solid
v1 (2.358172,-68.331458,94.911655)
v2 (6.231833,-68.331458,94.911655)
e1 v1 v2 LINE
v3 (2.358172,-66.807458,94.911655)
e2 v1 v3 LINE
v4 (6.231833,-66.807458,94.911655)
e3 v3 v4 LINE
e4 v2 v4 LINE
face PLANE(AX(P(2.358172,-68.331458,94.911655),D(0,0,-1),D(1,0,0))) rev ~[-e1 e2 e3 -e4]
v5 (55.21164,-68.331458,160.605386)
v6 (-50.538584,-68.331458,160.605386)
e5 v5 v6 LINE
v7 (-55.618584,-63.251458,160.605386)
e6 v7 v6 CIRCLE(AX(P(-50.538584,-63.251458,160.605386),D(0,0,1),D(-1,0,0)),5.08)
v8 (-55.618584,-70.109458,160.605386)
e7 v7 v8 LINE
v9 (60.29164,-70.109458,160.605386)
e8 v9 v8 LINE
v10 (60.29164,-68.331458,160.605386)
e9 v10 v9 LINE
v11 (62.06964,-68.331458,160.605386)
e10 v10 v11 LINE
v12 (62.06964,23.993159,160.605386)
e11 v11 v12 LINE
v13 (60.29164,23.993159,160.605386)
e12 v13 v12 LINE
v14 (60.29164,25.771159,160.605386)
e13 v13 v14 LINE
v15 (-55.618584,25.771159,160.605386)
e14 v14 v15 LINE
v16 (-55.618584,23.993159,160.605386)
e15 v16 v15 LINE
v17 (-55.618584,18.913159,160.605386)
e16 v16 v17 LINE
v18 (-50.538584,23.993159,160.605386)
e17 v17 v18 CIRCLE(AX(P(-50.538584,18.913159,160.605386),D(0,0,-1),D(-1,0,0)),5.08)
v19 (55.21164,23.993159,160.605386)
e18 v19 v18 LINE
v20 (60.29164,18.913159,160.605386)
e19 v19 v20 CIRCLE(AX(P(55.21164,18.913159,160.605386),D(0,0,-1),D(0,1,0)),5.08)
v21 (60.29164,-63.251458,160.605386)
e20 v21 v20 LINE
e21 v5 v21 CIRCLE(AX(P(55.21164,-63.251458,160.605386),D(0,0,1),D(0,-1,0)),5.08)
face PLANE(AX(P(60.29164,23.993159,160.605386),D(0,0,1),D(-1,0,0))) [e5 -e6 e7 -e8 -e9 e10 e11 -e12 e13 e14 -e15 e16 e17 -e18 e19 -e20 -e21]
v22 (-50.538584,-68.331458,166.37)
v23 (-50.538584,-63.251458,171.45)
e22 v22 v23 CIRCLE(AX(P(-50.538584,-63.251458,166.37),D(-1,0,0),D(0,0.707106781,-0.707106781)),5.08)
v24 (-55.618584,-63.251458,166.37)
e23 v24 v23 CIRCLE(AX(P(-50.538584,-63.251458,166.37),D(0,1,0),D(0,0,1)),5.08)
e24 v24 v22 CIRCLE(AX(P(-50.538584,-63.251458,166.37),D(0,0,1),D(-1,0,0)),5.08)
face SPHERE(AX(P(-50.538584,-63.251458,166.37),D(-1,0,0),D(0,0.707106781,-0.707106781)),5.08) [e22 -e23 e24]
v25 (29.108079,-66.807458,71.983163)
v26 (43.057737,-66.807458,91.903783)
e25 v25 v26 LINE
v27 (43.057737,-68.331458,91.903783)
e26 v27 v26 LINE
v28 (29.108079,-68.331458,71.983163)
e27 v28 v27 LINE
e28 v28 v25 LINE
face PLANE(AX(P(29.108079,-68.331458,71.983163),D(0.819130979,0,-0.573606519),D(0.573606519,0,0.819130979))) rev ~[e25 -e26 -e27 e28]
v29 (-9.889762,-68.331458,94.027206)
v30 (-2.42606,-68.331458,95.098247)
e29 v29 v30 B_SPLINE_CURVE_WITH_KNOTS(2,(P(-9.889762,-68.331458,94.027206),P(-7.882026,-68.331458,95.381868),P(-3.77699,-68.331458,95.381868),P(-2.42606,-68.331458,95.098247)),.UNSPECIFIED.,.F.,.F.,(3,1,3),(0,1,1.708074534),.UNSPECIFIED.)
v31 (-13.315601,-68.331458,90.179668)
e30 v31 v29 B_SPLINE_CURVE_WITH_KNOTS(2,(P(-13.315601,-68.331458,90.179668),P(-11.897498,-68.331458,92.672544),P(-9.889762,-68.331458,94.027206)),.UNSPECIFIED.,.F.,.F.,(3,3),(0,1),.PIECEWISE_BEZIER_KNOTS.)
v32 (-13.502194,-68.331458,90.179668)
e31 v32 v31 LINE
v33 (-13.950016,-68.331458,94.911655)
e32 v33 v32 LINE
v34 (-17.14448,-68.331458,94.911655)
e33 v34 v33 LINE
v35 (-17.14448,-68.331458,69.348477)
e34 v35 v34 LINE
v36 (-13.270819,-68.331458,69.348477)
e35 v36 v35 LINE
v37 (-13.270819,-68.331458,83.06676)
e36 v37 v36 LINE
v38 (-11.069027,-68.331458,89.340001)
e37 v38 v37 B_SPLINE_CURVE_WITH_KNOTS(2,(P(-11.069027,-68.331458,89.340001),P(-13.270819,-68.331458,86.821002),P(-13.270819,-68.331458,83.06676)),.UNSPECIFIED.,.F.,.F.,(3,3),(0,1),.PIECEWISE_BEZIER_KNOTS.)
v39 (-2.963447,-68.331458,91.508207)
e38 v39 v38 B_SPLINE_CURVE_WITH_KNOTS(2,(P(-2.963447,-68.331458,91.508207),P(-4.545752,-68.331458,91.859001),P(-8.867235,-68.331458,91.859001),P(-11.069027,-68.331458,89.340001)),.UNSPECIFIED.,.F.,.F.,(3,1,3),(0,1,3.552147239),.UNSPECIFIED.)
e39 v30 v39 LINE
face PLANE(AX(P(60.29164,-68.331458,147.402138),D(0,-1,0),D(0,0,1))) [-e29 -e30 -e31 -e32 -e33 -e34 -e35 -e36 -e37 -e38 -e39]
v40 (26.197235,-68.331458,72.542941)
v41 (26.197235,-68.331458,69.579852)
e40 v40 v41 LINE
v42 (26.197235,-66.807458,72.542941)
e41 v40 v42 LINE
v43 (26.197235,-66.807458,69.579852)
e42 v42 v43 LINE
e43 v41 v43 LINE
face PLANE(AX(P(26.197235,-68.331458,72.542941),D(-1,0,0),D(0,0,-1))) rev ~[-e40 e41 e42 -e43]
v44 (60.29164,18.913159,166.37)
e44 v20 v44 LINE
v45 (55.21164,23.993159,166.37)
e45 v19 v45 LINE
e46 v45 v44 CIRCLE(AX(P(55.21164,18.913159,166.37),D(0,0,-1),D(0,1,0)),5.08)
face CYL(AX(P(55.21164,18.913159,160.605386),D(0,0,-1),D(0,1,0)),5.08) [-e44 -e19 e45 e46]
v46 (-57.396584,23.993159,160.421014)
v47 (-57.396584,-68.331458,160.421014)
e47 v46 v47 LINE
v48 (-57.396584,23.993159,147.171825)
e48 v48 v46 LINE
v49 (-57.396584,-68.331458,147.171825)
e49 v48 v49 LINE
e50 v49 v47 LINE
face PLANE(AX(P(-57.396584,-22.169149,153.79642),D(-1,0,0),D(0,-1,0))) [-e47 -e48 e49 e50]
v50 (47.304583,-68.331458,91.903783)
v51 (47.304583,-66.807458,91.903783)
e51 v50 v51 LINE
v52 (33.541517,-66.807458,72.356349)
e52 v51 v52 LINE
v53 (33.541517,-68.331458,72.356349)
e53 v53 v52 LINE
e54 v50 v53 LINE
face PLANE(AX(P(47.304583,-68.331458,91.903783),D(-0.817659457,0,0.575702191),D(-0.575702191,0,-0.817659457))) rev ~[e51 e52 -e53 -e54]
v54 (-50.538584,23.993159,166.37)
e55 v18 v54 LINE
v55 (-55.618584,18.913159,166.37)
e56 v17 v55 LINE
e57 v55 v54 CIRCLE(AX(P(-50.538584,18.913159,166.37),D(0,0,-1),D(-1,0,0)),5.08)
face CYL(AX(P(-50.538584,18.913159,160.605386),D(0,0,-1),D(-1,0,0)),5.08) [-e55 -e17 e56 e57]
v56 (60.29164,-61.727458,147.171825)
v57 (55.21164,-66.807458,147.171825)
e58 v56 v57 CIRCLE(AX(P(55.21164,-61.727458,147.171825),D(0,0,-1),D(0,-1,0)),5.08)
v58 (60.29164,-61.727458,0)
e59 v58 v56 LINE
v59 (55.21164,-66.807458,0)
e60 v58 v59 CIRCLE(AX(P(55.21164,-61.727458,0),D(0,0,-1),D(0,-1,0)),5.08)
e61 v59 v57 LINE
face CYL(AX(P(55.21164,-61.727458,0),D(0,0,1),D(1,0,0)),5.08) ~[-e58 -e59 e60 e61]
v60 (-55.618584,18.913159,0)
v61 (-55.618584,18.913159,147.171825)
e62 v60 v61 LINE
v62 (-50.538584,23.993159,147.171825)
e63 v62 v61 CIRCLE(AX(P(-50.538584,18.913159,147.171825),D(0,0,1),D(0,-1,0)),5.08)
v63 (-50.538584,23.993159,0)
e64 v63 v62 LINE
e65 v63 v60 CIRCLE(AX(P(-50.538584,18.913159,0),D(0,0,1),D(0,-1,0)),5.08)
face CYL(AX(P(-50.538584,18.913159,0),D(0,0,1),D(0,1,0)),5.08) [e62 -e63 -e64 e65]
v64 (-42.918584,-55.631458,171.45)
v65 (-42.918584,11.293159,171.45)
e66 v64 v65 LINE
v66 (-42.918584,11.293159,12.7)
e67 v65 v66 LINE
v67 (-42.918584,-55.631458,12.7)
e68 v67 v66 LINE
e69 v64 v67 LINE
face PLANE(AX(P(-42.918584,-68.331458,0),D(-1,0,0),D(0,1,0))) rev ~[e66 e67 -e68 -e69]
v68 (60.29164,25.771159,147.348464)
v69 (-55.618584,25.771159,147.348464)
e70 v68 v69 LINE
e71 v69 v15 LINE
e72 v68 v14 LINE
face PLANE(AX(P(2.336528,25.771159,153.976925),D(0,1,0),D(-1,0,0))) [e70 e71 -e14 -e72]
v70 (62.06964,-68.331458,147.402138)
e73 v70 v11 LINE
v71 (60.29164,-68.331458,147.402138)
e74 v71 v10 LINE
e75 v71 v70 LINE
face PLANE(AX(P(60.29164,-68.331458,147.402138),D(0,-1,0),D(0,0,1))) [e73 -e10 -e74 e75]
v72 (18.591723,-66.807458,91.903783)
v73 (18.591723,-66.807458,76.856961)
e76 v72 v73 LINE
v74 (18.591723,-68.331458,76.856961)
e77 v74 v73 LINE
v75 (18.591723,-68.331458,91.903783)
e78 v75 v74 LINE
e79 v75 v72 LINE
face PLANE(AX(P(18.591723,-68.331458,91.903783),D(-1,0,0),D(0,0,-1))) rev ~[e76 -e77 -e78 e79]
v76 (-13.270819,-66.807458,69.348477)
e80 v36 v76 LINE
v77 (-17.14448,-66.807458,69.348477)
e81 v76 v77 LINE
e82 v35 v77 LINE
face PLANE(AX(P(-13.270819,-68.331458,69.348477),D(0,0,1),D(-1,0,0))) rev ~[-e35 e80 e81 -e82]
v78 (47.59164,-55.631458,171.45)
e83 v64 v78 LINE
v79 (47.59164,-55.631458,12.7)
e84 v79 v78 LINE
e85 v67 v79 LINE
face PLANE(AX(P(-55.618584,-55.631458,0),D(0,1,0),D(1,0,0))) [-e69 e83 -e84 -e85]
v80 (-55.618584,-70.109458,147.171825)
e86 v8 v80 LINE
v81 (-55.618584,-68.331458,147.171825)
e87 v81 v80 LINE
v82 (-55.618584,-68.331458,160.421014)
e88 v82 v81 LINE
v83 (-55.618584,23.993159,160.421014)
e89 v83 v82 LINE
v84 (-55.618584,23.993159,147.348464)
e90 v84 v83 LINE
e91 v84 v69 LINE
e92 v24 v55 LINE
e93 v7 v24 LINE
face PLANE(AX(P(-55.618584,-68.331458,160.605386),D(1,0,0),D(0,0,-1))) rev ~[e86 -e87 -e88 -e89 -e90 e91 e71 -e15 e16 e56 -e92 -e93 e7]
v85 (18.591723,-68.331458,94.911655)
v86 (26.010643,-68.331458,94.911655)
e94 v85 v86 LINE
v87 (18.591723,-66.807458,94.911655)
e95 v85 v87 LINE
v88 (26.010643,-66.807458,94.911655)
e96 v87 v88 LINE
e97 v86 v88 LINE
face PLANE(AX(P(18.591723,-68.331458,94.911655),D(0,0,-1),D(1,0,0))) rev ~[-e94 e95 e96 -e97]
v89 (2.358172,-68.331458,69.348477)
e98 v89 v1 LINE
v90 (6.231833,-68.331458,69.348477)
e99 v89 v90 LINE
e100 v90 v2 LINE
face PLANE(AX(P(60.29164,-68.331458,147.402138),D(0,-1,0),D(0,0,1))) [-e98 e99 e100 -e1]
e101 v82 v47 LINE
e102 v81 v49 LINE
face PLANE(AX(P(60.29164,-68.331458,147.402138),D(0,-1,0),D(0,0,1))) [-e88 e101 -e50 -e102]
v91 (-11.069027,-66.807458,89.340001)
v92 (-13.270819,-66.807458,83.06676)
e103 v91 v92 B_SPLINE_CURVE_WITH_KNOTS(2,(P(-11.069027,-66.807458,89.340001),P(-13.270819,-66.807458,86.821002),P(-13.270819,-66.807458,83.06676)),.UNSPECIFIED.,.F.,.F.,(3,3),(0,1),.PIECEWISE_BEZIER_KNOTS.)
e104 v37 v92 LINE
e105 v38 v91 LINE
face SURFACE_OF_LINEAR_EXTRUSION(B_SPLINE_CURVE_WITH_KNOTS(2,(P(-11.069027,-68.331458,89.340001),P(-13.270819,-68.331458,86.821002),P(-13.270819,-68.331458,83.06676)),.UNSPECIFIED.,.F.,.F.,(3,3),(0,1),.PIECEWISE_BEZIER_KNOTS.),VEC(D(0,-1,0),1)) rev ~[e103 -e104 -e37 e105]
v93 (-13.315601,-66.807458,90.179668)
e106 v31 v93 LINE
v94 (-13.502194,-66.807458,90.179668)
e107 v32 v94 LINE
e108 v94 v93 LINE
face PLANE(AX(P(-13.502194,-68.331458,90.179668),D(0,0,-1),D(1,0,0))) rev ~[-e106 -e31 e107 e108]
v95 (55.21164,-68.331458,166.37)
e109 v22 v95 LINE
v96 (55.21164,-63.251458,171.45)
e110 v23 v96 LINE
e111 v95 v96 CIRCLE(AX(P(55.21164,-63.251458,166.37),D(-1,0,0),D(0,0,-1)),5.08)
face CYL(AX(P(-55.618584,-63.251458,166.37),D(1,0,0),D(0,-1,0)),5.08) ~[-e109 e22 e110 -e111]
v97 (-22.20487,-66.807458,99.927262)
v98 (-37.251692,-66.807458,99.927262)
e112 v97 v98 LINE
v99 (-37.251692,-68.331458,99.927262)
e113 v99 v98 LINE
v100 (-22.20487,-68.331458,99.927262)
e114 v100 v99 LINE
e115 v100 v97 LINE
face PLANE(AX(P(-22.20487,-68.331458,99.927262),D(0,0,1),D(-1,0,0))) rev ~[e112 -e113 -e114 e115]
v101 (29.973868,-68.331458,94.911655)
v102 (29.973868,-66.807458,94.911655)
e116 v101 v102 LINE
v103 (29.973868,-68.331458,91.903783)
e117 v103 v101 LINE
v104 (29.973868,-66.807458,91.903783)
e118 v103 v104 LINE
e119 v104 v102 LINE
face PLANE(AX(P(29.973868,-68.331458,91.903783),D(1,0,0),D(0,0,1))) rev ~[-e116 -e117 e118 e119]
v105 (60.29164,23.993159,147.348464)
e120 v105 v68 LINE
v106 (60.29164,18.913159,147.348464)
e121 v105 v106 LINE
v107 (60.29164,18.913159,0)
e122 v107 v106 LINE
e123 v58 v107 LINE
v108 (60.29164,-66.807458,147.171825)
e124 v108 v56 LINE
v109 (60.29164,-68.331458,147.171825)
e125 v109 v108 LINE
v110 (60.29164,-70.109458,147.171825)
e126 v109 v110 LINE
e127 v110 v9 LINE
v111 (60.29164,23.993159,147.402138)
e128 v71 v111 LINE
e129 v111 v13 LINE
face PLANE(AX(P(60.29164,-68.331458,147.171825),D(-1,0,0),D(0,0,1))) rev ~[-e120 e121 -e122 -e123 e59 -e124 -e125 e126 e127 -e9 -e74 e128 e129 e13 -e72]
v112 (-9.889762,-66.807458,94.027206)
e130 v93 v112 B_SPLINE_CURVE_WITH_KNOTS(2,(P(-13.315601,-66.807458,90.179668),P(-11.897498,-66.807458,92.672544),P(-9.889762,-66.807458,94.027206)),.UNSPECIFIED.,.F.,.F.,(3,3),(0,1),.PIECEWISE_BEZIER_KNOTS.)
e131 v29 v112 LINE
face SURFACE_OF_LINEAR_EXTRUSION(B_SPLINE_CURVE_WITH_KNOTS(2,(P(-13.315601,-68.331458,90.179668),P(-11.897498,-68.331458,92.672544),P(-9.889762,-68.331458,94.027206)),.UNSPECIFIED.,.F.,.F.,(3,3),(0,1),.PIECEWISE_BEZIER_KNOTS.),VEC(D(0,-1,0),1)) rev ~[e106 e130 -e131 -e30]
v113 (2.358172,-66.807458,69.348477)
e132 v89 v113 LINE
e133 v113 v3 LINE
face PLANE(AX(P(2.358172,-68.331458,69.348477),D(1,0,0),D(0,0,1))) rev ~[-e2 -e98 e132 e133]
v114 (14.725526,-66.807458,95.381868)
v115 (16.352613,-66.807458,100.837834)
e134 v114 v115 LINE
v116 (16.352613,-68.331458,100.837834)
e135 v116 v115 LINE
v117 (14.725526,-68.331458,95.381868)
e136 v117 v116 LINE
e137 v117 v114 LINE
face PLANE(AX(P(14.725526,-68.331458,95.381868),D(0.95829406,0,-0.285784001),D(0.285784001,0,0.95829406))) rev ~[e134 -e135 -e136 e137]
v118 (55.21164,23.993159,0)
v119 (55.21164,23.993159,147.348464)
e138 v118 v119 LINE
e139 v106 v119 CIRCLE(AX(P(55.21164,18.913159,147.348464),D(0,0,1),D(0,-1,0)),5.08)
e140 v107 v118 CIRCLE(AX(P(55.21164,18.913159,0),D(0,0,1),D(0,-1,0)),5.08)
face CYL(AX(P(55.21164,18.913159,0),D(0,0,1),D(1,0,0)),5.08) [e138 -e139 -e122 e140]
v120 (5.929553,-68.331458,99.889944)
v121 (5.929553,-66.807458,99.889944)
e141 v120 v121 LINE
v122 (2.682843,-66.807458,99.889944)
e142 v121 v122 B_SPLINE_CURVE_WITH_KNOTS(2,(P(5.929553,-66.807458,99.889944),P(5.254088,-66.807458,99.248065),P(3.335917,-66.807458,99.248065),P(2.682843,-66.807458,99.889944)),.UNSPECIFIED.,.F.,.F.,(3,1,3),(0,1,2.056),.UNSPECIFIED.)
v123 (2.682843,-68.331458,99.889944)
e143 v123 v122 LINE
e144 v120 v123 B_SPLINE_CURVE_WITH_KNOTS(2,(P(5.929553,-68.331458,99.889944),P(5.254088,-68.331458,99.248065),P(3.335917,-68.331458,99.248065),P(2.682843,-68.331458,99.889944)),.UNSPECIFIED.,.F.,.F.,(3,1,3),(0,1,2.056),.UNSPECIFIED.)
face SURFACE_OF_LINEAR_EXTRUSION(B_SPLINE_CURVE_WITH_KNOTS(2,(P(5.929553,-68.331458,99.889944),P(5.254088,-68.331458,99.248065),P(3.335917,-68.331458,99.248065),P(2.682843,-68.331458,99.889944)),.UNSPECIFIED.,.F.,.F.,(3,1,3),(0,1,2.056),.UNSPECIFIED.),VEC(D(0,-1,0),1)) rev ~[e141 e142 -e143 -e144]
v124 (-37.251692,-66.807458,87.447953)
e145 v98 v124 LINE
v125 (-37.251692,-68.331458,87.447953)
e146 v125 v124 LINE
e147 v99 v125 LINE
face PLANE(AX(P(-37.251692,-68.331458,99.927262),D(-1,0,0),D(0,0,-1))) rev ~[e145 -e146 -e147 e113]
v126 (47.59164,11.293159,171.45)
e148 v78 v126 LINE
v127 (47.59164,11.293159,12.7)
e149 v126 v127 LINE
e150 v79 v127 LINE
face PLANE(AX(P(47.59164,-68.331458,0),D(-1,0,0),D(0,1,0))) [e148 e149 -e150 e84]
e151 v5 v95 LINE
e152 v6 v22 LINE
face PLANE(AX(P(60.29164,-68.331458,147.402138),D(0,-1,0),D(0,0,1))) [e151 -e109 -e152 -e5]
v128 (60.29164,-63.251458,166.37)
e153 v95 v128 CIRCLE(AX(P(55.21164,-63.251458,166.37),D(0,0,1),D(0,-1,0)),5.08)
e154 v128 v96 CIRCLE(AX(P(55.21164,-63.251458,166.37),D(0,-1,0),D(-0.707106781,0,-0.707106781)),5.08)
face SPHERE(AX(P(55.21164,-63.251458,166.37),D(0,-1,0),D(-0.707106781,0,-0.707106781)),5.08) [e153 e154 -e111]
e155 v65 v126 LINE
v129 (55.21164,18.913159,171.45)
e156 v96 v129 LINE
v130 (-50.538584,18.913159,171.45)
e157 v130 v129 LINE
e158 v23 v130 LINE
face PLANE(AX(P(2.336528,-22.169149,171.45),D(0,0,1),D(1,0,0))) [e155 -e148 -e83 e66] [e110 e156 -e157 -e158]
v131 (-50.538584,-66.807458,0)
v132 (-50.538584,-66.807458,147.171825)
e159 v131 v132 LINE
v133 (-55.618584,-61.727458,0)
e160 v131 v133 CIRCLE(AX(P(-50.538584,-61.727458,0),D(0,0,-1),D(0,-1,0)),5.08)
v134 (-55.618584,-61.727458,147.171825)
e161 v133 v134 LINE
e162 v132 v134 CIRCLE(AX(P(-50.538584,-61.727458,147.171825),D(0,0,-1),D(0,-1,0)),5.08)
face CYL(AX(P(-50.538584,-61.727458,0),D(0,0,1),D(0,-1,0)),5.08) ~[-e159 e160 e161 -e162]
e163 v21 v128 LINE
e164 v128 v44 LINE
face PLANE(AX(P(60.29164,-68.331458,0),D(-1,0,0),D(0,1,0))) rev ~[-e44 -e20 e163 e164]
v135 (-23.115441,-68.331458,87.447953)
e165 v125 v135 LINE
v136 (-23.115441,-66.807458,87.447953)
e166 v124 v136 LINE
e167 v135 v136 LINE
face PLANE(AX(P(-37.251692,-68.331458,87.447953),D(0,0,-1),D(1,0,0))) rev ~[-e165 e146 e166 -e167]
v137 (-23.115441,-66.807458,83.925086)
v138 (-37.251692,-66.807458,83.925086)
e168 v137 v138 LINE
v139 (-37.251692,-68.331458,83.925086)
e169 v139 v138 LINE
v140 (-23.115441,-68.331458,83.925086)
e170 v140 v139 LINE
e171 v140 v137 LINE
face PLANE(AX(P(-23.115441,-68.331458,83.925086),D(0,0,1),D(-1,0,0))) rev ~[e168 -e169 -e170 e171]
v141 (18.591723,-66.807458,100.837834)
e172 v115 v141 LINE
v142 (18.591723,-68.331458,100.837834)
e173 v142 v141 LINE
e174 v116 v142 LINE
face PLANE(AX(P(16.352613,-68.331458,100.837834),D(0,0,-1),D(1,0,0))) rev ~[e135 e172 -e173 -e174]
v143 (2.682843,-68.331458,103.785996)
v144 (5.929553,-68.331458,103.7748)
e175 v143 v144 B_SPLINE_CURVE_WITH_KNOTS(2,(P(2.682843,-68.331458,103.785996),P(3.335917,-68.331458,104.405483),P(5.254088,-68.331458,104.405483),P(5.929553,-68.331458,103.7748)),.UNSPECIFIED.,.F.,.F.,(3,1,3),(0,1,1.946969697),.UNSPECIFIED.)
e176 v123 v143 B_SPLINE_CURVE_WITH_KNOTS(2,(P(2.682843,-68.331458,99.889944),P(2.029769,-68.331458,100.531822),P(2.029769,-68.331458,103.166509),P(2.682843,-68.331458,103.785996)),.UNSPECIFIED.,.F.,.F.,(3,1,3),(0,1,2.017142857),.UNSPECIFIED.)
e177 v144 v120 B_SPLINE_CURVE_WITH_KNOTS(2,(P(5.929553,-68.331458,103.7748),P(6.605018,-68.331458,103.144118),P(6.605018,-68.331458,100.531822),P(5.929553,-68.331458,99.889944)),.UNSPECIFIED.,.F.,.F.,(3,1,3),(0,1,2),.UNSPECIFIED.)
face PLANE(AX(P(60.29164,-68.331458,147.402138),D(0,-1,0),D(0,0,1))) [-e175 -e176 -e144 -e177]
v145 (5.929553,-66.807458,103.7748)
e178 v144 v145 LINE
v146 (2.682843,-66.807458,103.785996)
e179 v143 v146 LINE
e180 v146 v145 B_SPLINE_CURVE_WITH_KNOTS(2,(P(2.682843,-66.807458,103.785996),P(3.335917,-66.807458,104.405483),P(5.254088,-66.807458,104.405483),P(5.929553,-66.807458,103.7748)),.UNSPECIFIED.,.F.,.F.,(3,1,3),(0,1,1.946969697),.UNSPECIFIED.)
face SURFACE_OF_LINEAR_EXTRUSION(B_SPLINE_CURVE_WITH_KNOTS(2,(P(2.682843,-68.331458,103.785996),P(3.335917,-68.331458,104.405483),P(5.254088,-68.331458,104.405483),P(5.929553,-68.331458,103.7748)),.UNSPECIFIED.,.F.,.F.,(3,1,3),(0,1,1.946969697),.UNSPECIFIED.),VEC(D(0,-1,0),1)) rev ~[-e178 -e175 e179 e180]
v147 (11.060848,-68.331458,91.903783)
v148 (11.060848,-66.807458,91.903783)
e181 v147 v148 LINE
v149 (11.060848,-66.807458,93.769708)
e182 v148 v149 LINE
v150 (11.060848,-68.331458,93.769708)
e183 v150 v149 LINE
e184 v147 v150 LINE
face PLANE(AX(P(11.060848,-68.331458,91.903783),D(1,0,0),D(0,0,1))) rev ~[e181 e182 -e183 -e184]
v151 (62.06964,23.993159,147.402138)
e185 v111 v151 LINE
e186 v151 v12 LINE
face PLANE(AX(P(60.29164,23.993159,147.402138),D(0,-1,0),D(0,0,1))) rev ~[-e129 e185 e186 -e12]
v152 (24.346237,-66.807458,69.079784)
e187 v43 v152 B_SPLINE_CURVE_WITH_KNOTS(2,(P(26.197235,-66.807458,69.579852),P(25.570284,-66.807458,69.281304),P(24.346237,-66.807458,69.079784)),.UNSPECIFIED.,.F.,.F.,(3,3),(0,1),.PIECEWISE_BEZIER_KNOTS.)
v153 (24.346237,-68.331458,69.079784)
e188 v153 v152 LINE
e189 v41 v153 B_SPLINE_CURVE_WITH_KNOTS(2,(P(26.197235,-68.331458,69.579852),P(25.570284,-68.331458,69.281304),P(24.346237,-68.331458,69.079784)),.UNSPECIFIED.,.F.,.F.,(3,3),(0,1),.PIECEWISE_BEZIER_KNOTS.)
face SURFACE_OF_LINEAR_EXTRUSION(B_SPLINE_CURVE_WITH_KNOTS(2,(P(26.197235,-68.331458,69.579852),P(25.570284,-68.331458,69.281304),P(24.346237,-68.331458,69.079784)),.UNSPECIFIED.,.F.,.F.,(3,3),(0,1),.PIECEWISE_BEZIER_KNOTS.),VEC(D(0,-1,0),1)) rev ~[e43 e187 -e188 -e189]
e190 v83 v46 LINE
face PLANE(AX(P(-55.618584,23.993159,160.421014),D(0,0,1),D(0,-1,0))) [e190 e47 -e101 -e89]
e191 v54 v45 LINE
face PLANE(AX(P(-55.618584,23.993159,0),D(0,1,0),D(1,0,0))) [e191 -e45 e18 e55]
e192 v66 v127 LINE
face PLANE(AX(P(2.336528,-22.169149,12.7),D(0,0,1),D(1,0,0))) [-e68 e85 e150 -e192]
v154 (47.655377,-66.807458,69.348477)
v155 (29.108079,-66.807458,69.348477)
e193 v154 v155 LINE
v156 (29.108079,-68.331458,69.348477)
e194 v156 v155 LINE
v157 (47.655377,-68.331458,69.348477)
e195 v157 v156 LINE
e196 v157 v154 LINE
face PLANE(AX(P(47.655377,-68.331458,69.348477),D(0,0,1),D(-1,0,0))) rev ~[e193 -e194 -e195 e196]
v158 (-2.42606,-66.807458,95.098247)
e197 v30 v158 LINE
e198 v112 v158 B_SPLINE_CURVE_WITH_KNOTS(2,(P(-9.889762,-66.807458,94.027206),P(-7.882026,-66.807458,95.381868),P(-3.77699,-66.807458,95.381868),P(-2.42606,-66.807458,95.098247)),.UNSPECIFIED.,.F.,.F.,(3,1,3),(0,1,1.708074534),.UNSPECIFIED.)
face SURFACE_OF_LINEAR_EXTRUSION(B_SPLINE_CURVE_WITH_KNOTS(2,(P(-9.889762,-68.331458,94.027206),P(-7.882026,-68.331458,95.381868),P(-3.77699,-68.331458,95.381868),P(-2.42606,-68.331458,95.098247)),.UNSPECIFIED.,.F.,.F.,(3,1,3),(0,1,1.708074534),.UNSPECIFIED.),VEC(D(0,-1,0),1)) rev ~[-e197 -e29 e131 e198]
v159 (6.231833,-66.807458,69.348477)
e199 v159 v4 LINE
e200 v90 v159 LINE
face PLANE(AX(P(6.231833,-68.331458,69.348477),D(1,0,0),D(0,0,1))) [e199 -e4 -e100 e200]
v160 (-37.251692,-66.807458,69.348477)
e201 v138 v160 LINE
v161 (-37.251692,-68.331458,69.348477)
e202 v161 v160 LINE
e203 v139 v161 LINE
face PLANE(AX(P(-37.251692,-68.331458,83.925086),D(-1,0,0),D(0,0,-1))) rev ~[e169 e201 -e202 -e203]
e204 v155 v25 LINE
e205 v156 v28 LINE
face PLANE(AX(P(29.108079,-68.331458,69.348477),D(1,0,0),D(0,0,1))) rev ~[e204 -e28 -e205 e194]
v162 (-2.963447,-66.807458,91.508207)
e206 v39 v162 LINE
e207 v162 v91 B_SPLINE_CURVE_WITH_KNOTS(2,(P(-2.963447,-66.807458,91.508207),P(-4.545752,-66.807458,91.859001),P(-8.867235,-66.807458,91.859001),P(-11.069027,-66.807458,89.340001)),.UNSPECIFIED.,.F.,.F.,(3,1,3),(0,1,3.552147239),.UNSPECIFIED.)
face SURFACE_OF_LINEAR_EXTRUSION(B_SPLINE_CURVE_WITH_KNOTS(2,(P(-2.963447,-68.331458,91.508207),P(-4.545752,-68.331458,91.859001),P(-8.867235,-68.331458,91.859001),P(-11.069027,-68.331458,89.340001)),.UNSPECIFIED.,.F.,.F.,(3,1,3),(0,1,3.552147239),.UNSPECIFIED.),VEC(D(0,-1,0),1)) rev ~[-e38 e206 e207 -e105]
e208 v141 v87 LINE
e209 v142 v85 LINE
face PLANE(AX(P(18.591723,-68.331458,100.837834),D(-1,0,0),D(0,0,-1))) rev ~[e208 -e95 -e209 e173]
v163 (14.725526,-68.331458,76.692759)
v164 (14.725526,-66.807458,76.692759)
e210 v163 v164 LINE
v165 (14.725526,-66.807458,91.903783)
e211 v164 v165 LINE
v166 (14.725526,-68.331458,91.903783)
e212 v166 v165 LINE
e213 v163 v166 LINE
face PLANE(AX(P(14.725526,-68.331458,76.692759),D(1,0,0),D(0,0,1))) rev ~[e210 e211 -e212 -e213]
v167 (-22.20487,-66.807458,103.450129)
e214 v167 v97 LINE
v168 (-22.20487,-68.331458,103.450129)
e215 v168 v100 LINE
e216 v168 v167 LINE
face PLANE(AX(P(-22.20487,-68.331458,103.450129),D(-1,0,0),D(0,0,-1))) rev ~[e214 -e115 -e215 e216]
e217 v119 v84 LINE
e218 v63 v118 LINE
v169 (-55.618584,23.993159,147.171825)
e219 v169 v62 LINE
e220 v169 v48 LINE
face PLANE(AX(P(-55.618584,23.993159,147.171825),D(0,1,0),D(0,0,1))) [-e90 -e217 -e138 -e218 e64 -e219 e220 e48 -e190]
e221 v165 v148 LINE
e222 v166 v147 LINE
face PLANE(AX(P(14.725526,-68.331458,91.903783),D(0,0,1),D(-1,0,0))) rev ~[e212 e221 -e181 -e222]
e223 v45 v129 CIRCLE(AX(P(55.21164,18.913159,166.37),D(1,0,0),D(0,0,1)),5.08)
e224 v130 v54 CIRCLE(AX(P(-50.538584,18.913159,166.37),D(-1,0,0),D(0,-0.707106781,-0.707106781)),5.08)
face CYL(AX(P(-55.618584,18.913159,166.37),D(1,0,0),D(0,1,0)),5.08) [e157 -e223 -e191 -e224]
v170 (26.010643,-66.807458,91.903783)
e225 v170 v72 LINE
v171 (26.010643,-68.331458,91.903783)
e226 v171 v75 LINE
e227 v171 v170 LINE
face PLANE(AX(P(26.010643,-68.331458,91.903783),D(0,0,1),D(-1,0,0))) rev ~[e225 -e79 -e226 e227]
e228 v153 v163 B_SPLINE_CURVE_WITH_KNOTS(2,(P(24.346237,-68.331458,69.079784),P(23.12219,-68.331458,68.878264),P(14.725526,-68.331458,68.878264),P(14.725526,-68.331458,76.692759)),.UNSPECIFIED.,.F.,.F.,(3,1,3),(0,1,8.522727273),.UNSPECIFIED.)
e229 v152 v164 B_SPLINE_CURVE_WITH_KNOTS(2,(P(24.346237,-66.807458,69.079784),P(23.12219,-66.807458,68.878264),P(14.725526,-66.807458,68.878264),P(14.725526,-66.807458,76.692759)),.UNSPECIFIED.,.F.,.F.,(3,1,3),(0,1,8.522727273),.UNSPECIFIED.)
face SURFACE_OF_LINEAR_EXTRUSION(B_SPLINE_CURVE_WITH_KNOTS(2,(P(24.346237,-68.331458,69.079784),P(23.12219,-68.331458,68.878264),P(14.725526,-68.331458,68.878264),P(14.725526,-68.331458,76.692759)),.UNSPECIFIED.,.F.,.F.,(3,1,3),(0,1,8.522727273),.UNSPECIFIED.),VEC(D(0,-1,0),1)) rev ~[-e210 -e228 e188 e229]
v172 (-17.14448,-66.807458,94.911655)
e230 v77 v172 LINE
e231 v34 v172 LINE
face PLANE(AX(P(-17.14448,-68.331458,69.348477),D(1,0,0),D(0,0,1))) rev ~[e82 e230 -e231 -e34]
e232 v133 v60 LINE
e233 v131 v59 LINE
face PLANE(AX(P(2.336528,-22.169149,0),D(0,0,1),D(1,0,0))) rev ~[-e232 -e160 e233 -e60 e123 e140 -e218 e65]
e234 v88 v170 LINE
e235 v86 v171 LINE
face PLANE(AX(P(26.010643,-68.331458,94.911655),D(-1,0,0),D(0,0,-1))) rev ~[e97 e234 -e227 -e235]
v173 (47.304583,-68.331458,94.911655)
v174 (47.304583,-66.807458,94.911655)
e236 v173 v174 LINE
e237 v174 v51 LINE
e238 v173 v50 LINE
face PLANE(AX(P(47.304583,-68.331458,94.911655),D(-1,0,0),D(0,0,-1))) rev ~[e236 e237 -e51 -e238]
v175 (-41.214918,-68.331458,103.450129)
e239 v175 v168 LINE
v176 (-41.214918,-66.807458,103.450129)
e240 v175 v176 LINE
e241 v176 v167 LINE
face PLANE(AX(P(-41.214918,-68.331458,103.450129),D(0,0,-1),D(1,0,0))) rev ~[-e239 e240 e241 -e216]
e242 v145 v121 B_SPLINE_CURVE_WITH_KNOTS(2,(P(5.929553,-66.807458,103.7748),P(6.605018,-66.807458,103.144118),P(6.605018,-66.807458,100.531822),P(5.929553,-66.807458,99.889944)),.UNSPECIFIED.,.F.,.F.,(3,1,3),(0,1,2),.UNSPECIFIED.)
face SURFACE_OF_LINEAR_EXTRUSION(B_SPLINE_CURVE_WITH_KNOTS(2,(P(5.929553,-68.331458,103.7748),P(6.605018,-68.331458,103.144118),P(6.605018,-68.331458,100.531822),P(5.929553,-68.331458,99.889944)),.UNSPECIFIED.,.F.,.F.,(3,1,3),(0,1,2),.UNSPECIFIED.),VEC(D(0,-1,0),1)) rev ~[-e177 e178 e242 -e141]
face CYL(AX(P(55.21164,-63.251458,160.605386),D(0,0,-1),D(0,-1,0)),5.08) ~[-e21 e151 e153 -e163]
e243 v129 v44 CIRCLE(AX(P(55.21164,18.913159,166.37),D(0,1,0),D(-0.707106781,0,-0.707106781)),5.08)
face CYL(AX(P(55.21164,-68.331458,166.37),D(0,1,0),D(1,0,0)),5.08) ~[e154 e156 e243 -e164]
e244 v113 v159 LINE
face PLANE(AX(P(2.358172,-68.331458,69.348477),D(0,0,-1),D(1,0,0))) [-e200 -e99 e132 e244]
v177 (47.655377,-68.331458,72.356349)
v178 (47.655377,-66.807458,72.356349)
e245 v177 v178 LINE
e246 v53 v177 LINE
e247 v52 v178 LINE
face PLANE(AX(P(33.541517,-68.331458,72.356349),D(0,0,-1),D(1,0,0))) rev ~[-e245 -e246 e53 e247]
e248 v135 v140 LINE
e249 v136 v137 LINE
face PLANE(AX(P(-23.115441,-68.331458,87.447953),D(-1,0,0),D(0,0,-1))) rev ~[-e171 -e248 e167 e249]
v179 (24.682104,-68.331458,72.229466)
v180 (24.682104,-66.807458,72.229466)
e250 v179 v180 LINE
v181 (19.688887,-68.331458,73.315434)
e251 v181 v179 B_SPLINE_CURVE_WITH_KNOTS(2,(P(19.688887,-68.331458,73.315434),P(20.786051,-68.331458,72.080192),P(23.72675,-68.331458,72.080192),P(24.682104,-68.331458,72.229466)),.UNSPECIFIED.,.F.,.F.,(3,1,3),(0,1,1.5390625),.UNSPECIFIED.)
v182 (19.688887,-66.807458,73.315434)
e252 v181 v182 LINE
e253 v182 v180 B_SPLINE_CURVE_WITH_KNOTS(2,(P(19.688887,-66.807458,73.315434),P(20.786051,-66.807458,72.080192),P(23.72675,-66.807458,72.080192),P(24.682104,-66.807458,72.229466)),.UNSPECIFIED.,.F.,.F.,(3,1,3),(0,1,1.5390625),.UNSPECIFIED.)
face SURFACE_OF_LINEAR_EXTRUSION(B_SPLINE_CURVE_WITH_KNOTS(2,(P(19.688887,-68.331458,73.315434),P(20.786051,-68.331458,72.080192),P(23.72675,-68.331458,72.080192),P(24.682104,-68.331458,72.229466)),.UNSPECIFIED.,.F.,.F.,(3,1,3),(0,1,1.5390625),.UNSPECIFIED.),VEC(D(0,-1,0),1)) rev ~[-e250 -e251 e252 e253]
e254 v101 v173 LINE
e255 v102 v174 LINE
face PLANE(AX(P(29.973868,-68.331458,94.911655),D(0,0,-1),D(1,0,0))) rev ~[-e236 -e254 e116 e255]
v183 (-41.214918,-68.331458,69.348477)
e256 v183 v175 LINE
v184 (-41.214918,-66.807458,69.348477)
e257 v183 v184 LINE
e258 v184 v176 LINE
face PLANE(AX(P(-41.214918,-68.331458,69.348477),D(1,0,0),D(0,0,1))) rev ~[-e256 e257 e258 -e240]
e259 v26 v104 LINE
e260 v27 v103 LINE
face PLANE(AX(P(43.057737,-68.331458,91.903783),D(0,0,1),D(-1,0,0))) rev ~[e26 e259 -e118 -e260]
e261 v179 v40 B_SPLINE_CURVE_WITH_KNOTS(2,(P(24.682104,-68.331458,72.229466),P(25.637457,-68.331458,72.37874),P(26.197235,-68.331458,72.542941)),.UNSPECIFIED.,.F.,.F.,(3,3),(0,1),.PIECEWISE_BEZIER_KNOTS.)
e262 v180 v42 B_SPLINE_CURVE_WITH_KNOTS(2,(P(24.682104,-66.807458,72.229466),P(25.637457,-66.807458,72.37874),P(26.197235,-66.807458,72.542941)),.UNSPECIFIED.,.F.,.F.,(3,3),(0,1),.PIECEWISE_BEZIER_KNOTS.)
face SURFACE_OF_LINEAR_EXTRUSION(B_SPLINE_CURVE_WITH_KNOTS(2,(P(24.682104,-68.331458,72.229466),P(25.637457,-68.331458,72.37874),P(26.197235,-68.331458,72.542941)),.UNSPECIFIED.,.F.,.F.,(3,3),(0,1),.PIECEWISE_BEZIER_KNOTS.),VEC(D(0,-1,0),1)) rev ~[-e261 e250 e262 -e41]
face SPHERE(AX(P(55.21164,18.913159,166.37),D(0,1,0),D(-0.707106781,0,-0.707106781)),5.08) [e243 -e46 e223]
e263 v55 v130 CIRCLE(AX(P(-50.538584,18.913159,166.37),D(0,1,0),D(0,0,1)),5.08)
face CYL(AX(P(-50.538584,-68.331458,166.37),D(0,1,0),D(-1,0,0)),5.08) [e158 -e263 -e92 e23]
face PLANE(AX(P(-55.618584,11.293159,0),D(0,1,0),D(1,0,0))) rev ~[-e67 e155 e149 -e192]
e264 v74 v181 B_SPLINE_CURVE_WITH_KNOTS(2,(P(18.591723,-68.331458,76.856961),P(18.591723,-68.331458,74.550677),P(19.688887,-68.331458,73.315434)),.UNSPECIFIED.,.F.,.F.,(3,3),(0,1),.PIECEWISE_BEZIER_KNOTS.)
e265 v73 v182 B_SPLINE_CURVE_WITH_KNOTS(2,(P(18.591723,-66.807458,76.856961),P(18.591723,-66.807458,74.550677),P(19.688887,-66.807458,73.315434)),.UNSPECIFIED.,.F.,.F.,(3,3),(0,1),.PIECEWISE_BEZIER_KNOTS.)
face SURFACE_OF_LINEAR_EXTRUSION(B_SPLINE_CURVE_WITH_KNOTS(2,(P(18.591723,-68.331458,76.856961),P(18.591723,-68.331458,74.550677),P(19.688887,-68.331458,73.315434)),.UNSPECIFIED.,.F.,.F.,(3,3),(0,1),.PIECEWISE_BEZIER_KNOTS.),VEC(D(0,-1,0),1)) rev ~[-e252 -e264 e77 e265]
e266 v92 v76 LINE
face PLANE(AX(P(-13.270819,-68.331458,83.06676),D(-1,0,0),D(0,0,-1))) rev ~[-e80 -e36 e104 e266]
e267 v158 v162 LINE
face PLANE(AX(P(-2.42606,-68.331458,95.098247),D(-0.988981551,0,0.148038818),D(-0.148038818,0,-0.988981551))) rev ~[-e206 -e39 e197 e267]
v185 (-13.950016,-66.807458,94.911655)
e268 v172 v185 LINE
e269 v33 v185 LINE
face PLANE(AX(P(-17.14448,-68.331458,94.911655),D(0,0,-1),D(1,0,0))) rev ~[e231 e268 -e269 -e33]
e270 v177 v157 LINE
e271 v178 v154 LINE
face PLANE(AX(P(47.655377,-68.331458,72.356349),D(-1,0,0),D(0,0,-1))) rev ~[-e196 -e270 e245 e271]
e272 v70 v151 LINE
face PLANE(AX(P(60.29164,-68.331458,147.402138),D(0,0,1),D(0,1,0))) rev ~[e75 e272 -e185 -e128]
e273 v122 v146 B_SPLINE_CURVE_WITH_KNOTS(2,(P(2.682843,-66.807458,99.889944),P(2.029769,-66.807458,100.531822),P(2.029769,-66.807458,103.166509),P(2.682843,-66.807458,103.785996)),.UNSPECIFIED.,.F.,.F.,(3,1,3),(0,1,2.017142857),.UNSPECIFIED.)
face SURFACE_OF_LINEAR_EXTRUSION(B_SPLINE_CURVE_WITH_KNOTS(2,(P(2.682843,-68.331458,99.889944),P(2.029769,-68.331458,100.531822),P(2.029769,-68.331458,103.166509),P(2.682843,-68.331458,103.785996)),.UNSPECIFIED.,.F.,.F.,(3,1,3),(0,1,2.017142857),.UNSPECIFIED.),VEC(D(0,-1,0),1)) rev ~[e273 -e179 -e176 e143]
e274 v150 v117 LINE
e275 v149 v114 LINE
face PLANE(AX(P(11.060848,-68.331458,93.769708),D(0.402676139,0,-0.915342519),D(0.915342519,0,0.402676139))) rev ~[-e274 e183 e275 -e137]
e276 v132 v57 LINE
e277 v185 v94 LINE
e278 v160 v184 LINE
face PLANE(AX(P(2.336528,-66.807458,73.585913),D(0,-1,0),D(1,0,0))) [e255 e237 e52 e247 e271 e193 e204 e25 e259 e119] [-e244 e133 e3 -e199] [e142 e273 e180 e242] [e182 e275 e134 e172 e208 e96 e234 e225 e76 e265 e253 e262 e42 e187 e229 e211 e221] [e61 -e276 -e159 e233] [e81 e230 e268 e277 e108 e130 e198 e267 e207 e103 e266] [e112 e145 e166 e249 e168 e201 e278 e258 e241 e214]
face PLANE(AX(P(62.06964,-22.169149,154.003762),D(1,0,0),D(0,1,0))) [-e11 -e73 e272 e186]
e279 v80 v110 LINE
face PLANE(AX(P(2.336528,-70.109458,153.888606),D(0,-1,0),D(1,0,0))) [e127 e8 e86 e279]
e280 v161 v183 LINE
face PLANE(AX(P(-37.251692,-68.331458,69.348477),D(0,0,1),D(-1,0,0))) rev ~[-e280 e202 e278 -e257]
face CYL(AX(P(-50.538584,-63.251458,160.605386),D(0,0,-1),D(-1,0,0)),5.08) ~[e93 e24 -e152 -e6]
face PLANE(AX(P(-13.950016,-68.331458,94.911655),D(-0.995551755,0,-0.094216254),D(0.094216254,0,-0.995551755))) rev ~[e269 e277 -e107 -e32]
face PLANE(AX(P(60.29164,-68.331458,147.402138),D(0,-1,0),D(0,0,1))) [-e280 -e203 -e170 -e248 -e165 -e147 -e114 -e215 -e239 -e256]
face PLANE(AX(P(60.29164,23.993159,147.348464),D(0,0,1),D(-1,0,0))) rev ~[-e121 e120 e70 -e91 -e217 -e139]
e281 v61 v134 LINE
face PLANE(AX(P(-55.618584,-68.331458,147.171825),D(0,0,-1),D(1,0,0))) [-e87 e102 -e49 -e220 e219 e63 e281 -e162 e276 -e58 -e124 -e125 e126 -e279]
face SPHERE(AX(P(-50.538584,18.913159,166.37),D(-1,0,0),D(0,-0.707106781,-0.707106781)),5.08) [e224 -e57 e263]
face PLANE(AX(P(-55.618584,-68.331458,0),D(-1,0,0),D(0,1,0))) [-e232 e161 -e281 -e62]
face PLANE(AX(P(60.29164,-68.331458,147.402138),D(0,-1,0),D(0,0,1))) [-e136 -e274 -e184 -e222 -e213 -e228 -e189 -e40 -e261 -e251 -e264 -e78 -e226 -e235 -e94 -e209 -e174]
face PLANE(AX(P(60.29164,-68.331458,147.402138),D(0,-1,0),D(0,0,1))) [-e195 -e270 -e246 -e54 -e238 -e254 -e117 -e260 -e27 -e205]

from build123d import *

# Parameters (mm, degrees)
F0_W          = 115.9102246165
F0_H          = 92.3246163875
F1_DEPTH      = 171.45
F2_T          = -12.7
F3_R          = 5.08
F4_W          = 115.9102246165
F4_H          = 13.2569223642
F6_DEPTH      = 1.778
F5_W          = 92.3246163875
F5_H          = 13.2491886616
F7_DEPTH      = 1.778
F8_W          = 92.3246163875
F8_H          = 13.2032483816
F9_DEPTH      = 1.778
F11_DEPTH     = 1.778
F12_W         = 115.9102246165
F12_H         = 147.1718251705
F12_W_2       = 3.8736611168
F12_H_2       = 25.5631778903
F13_DEPTH     = 1.524
F14_R         = 5.08
F15_T1_DEPTH  = 5.7646141005
F15_S5_W      = 5.08
F15_S5_H      = 5.08
F15_T6_DEPTH  = 5.08
F15_S11_W     = 5.08
F15_S11_H     = 5.08
F15_T12_DEPTH = 5.08
F15_S17_W     = 5.08
F15_S17_H     = 5.08
F15_T18_DEPTH = 5.08
F15_S23_W     = 5.08
F15_S23_H     = 5.08
F15_T24_DEPTH = 5.08


# Not quite as in the source:
# - a fillet or chamfer that OpenCascade refuses, or shapes differently, is made with other operations: its cross-section is extruded or revolved along the edge and cut away or added
# - a feature names something its author has since deleted; it is built from what else it names


with BuildPart() as f1:
    # F0 (on Top) → F1 (new body)
    with BuildSketch(Plane.XY):
        with Locations((2.3365281522, -22.1691494808)):
            Rectangle(F0_W, F0_H)
    extrude(amount=F1_DEPTH)

    # F2
    f2_openings = [f1.faces().sort_by_distance(p)[0] for p in [
        (2.336528, -22.169149, 171.45),
    ]]
    offset(amount=F2_T, openings=f2_openings)

    # F3
    f3_edges = [f1.edges().sort_by_distance(p)[0] for p in [
        (60.29164, -22.169149, 171.45),
        (2.336528, 23.993159, 171.45),
        (-55.618584, -22.169149, 171.45),
        (2.336528, -68.331458, 171.45),
    ]]
    fillet(f3_edges, radius=F3_R)

    # F4 (on face) → F6 (join)
    with BuildSketch(Plane(origin=(0, 23.993158713, 0), x_dir=(-1, 0, 0), z_dir=(0, 1, 0))):
        with Locations((-2.3365281522, 153.9769247174)):
            Rectangle(F4_W, F4_H)
    extrude(amount=F6_DEPTH)

    # F5 (on face) → F7 (join)
    with BuildSketch(Plane(origin=(-55.618584156, 0, 0), x_dir=(0, -1, 0), z_dir=(-1, 0, 0))):
        with Locations((22.1691494808, 153.7964195013)):
            Rectangle(F5_W, F5_H)
    extrude(amount=F7_DEPTH)

    # F8 (on face) → F9 (join)
    with BuildSketch(Plane.YZ.offset(60.2916404605)):
        with Locations((-22.1691494808, 154.0037617087)):
            Rectangle(F8_W, F8_H)
    extrude(amount=F9_DEPTH)

    # F10 (on face) → F11 (join)
    with BuildSketch(Plane.XZ.offset(68.3314576745)):
        Polygon((60.2916404605, 147.4021375179), (60.2916404605, 160.6053858995), (-55.618584156, 160.6053858995), (-55.618584156, 160.4210138321), (-55.618584156, 147.1718251705), (60.2916404605, 147.1718251705), align=None)
    extrude(amount=F11_DEPTH)

    # F12 (on face) → F13 (cut)
    with BuildSketch(Plane.XZ.offset(68.3314576745)):
        with Locations((2.3365281522, 73.5859125853)):
            Rectangle(F12_W, F12_H)
        Polygon((-37.2516920373, 83.9250860008), (-37.2516920373, 69.3484768271), (-41.214917573, 69.3484768271), (-41.214917573, 103.4501293179), (-22.2048696645, 103.4501293179), (-22.2048696645, 99.9272621751), (-37.2516920373, 99.9272621751), (-37.2516920373, 87.4479531437), (-23.1154412565, 87.4479531437), (-23.1154412565, 83.9250860008), align=None, mode=Mode.SUBTRACT)
        with BuildLine():
            add(Edge.make_bspline(
                [(-9.8897620677, 94.027206081), (-7.8820263443, 95.3818679166), (-5.4787144375, 95.3818679166)],
                knots=[0, 0, 0, 1, 1, 1], degree=2))
            add(Edge.make_bspline(
                [(-5.4787144375, 95.3818679166), (-3.7769904787, 95.3818679166), (-2.4260604938, 95.0982472568)],
                knots=[0, 0, 0, 1, 1, 1], degree=2))
            Line((-2.4260604938, 95.0982472568), (-2.9634470072, 91.5082067998))
            add(Edge.make_bspline(
                [(-2.9634470072, 91.5082067998), (-4.5457517408, 91.8590007738), (-5.7623350973, 91.8590007738)],
                knots=[0, 0, 0, 1, 1, 1], degree=2))
            add(Edge.make_bspline(
                [(-5.7623350973, 91.8590007738), (-8.867234952, 91.8590007738), (-11.0690269163, 89.3400014926)],
                knots=[0, 0, 0, 1, 1, 1], degree=2))
            add(Edge.make_bspline(
                [(-11.0690269163, 89.3400014926), (-13.2708188806, 86.8210022115), (-13.2708188806, 83.0667603198)],
                knots=[0, 0, 0, 1, 1, 1], degree=2))
            Line((-13.2708188806, 83.0667603198), (-13.2708188806, 69.3484768271))
            Line((-13.2708188806, 69.3484768271), (-17.1444799974, 69.3484768271))
            Line((-17.1444799974, 69.3484768271), (-17.1444799974, 94.9116547175))
            Line((-17.1444799974, 94.9116547175), (-13.9500157238, 94.9116547175))
            Line((-13.9500157238, 94.9116547175), (-13.5021936294, 90.1796679197))
            Line((-13.5021936294, 90.1796679197), (-13.31560109, 90.1796679197))
            add(Edge.make_bspline(
                [(-13.31560109, 90.1796679197), (-11.897497791, 92.6725442453), (-9.8897620677, 94.027206081)],
                knots=[0, 0, 0, 1, 1, 1], degree=2))
        make_face(mode=Mode.SUBTRACT)
        with Locations((4.2950027734, 82.1300657723)):
            Rectangle(F12_W_2, F12_H_2, mode=Mode.SUBTRACT)
        with BuildLine():
            add(Edge.make_bspline(
                [(19.6888872694, 73.3154342136), (20.7860514007, 72.0801916032), (22.6967590036, 72.0801916032)],
                knots=[0, 0, 0, 1, 1, 1], degree=2))
            add(Edge.make_bspline(
                [(22.6967590036, 72.0801916032), (23.7267498208, 72.0801916032), (24.6821036223, 72.2294656346)],
                knots=[0, 0, 0, 1, 1, 1], degree=2))
            add(Edge.make_bspline(
                [(24.6821036223, 72.2294656346), (25.6374574237, 72.3787396661), (26.1972350418, 72.5429411007)],
                knots=[0, 0, 0, 1, 1, 1], degree=2))
            Line((26.1972350418, 72.5429411007), (26.1972350418, 69.5798515759))
            add(Edge.make_bspline(
                [(26.1972350418, 69.5798515759), (25.5702841096, 69.281303513), (24.3462370515, 69.0797835705)],
                knots=[0, 0, 0, 1, 1, 1], degree=2))
            add(Edge.make_bspline(
                [(24.3462370515, 69.0797835705), (23.1221899933, 68.878263628), (22.1369813856, 68.878263628)],
                knots=[0, 0, 0, 1, 1, 1], degree=2))
            add(Edge.make_bspline(
                [(22.1369813856, 68.878263628), (14.7255257228, 68.878263628), (14.7255257228, 76.6927591758)],
                knots=[0, 0, 0, 1, 1, 1], degree=2))
            Line((14.7255257228, 76.6927591758), (14.7255257228, 91.9037829832))
            Line((14.7255257228, 91.9037829832), (11.0608482501, 91.9037829832))
            Line((11.0608482501, 91.9037829832), (11.0608482501, 93.7697083767))
            Line((11.0608482501, 93.7697083767), (14.7255257228, 95.3818679166))
            Line((14.7255257228, 95.3818679166), (16.3526126659, 100.8378337671))
            Line((16.3526126659, 100.8378337671), (18.591723138, 100.8378337671))
            Line((18.591723138, 100.8378337671), (18.591723138, 94.9116547175))
            Line((18.591723138, 94.9116547175), (26.0106425024, 94.9116547175))
            Line((26.0106425024, 94.9116547175), (26.0106425024, 91.9037829832))
            Line((26.0106425024, 91.9037829832), (18.591723138, 91.9037829832))
            Line((18.591723138, 91.9037829832), (18.591723138, 76.8569606104))
            add(Edge.make_bspline(
                [(18.591723138, 76.8569606104), (18.591723138, 74.5506768241), (19.6888872694, 73.3154342136)],
                knots=[0, 0, 0, 1, 1, 1], degree=2))
        make_face(mode=Mode.SUBTRACT)
        with BuildLine():
            add(Edge.make_bspline(
                [(2.6828432334, 99.8899436672), (2.0297693457, 100.5318220026), (2.0297693457, 101.837969778)],
                knots=[0, 0, 0, 1, 1, 1], degree=2))
            add(Edge.make_bspline(
                [(2.0297693457, 101.837969778), (2.0297693457, 103.1665086581), (2.6828432334, 103.7859958888)],
                knots=[0, 0, 0, 1, 1, 1], degree=2))
            add(Edge.make_bspline(
                [(2.6828432334, 103.7859958888), (3.3359171211, 104.4054831194), (4.3211257289, 104.4054831194)],
                knots=[0, 0, 0, 1, 1, 1], degree=2))
            add(Edge.make_bspline(
                [(4.3211257289, 104.4054831194), (5.2540884256, 104.4054831194), (5.9295534181, 103.7748003364)],
                knots=[0, 0, 0, 1, 1, 1], degree=2))
            add(Edge.make_bspline(
                [(5.9295534181, 103.7748003364), (6.6050184105, 103.1441175534), (6.6050184105, 101.837969778)],
                knots=[0, 0, 0, 1, 1, 1], degree=2))
            add(Edge.make_bspline(
                [(6.6050184105, 101.837969778), (6.6050184105, 100.5318220026), (5.9295534181, 99.8899436672)],
                knots=[0, 0, 0, 1, 1, 1], degree=2))
            add(Edge.make_bspline(
                [(5.9295534181, 99.8899436672), (5.2540884256, 99.2480653319), (4.3211257289, 99.2480653319)],
                knots=[0, 0, 0, 1, 1, 1], degree=2))
            add(Edge.make_bspline(
                [(4.3211257289, 99.2480653319), (3.3359171211, 99.2480653319), (2.6828432334, 99.8899436672)],
                knots=[0, 0, 0, 1, 1, 1], degree=2))
        make_face(mode=Mode.SUBTRACT)
        Polygon((47.6553770665, 72.3563485614), (47.6553770665, 69.3484768271), (29.1080786556, 69.3484768271), (29.1080786556, 71.9831634827), (43.057736897, 91.9037829832), (29.9738680381, 91.9037829832), (29.9738680381, 94.9116547175), (47.3045830925, 94.9116547175), (47.3045830925, 91.9037829832), (33.5415173904, 72.3563485614), align=None, mode=Mode.SUBTRACT)
    extrude(amount=-F13_DEPTH, mode=Mode.SUBTRACT)

    # F14
    f14_edges = [f1.edges().sort_by_distance(p)[0] for p in [
        (60.29164, -66.807458, 73.585913),
        (-55.618584, -66.807458, 73.585913),
        (-55.618584, 23.993159, 73.585913),
        (60.29164, 23.993159, 73.674232),
    ]]
    fillet(f14_edges, radius=F14_R)

    # F15: fillet of radius 5.08 on 4 edges, made by hand

    # F15_s2 → F15_t1 (cut)
    with BuildSketch(Plane.XY.offset(160.6053858995)):
        with BuildLine():
            ThreePointArc((-55.618584156, -63.2514576745), (-54.1306866045, -66.8435601229), (-50.538584156, -68.3314576745))
            Line((-50.538584156, -68.3314576745), (-55.618584156, -68.3314576745))
            Line((-55.618584156, -68.3314576745), (-55.618584156, -63.2514576745))
        make_face()
        with BuildLine():
            ThreePointArc((55.2116404605, -68.3314576745), (58.8037429089, -66.8435601229), (60.2916404605, -63.2514576745))
            Line((60.2916404605, -63.2514576745), (60.2916404605, -68.3314576745))
            Line((60.2916404605, -68.3314576745), (55.2116404605, -68.3314576745))
        make_face()
        with BuildLine():
            ThreePointArc((55.2116404605, 23.993158713), (58.8037429089, 22.5052611614), (60.2916404605, 18.913158713))
            Line((60.2916404605, 18.913158713), (60.2916404605, 23.993158713))
            Line((60.2916404605, 23.993158713), (55.2116404605, 23.993158713))
        make_face()
        with BuildLine():
            ThreePointArc((-55.618584156, 18.913158713), (-54.1306866045, 22.5052611614), (-50.538584156, 23.993158713))
            Line((-50.538584156, 23.993158713), (-55.618584156, 23.993158713))
            Line((-55.618584156, 23.993158713), (-55.618584156, 18.913158713))
        make_face()
    extrude(amount=F15_T1_DEPTH, mode=Mode.SUBTRACT)


with BuildPart() as f15_tool4:
    # F15_s5 → F15_t6 (new body)
    with BuildSketch(Plane.YZ.offset(-50.538584156)):
        with Locations((21.453158713, 168.91)):
            Rectangle(F15_S5_W, F15_S5_H)
    extrude(amount=-F15_T6_DEPTH)

    # F15_s7 → F15_t8 (revolve, cut)
    with BuildSketch(Plane(origin=(-50.538584156, 18.913158713, 166.37), x_dir=(0, -0.7071067812, -0.7071067812), z_dir=(0, 0.7071067812, -0.7071067812))):
        with BuildLine():
            ThreePointArc((0, -5.08), (5.08, 0), (0, 5.08))
            Line((0, 5.08), (0, -5.08))
        make_face()
    revolve(axis=Axis((-50.538584156, 18.913158713, 166.37), (-1, 0, 0)), mode=Mode.SUBTRACT)


with BuildPart() as f1_1:
    add(f1.part)

    # F15_t3: cut F15_tool4
    add(f15_tool4.part, mode=Mode.SUBTRACT)


with BuildPart() as f15_tool10:
    # F15_s11 → F15_t12 (new body)
    with BuildSketch(Plane.XZ.offset(-18.913158713)):
        with Locations((57.7516404605, 168.91)):
            Rectangle(F15_S11_W, F15_S11_H)
    extrude(amount=-F15_T12_DEPTH)

    # F15_s13 → F15_t14 (revolve, cut)
    with BuildSketch(Plane(origin=(55.2116404605, 18.913158713, 166.37), x_dir=(-0.7071067812, 0, -0.7071067812), z_dir=(0.7071067812, 0, -0.7071067812))):
        with BuildLine():
            ThreePointArc((0, -5.08), (5.08, 0), (0, 5.08))
            Line((0, 5.08), (0, -5.08))
        make_face()
    revolve(axis=Axis((55.2116404605, 18.913158713, 166.37), (0, 1, 0)), mode=Mode.SUBTRACT)


with BuildPart() as f1_2:
    add(f1_1.part)

    # F15_t9: cut F15_tool10
    add(f15_tool10.part, mode=Mode.SUBTRACT)


with BuildPart() as f15_tool16:
    # F15_s17 → F15_t18 (new body)
    with BuildSketch(Plane.XZ.offset(63.2514576745)):
        with Locations((57.7516404605, 168.91)):
            Rectangle(F15_S17_W, F15_S17_H)
    extrude(amount=F15_T18_DEPTH)

    # F15_s19 → F15_t20 (revolve, cut)
    with BuildSketch(Plane(origin=(55.2116404605, -63.2514576745, 166.37), x_dir=(-0.7071067812, 0, -0.7071067812), z_dir=(-0.7071067812, 0, 0.7071067812))):
        with BuildLine():
            ThreePointArc((0, -5.08), (5.08, 0), (0, 5.08))
            Line((0, 5.08), (0, -5.08))
        make_face()
    revolve(axis=Axis((55.2116404605, -63.2514576745, 166.37), (0, -1, 0)), mode=Mode.SUBTRACT)


with BuildPart() as f1_3:
    add(f1_2.part)

    # F15_t15: cut F15_tool16
    add(f15_tool16.part, mode=Mode.SUBTRACT)


with BuildPart() as f15_tool22:
    # F15_s23 → F15_t24 (new body)
    with BuildSketch(Plane.YZ.offset(-50.538584156)):
        with Locations((-65.7914576745, 168.91)):
            Rectangle(F15_S23_W, F15_S23_H)
    extrude(amount=-F15_T24_DEPTH)

    # F15_s25 → F15_t26 (revolve, cut)
    with BuildSketch(Plane(origin=(-50.538584156, -63.2514576745, 166.37), x_dir=(0, 0.7071067812, -0.7071067812), z_dir=(0, 0.7071067812, 0.7071067812))):
        with BuildLine():
            ThreePointArc((0, -5.08), (5.08, 0), (0, 5.08))
            Line((0, 5.08), (0, -5.08))
        make_face()
    revolve(axis=Axis((-50.538584156, -63.2514576745, 166.37), (-1, 0, 0)), mode=Mode.SUBTRACT)


with BuildPart() as f1_4:
    add(f1_3.part)

    # F15_t21: cut F15_tool22
    add(f15_tool22.part, mode=Mode.SUBTRACT)


solid = f1_4.part
